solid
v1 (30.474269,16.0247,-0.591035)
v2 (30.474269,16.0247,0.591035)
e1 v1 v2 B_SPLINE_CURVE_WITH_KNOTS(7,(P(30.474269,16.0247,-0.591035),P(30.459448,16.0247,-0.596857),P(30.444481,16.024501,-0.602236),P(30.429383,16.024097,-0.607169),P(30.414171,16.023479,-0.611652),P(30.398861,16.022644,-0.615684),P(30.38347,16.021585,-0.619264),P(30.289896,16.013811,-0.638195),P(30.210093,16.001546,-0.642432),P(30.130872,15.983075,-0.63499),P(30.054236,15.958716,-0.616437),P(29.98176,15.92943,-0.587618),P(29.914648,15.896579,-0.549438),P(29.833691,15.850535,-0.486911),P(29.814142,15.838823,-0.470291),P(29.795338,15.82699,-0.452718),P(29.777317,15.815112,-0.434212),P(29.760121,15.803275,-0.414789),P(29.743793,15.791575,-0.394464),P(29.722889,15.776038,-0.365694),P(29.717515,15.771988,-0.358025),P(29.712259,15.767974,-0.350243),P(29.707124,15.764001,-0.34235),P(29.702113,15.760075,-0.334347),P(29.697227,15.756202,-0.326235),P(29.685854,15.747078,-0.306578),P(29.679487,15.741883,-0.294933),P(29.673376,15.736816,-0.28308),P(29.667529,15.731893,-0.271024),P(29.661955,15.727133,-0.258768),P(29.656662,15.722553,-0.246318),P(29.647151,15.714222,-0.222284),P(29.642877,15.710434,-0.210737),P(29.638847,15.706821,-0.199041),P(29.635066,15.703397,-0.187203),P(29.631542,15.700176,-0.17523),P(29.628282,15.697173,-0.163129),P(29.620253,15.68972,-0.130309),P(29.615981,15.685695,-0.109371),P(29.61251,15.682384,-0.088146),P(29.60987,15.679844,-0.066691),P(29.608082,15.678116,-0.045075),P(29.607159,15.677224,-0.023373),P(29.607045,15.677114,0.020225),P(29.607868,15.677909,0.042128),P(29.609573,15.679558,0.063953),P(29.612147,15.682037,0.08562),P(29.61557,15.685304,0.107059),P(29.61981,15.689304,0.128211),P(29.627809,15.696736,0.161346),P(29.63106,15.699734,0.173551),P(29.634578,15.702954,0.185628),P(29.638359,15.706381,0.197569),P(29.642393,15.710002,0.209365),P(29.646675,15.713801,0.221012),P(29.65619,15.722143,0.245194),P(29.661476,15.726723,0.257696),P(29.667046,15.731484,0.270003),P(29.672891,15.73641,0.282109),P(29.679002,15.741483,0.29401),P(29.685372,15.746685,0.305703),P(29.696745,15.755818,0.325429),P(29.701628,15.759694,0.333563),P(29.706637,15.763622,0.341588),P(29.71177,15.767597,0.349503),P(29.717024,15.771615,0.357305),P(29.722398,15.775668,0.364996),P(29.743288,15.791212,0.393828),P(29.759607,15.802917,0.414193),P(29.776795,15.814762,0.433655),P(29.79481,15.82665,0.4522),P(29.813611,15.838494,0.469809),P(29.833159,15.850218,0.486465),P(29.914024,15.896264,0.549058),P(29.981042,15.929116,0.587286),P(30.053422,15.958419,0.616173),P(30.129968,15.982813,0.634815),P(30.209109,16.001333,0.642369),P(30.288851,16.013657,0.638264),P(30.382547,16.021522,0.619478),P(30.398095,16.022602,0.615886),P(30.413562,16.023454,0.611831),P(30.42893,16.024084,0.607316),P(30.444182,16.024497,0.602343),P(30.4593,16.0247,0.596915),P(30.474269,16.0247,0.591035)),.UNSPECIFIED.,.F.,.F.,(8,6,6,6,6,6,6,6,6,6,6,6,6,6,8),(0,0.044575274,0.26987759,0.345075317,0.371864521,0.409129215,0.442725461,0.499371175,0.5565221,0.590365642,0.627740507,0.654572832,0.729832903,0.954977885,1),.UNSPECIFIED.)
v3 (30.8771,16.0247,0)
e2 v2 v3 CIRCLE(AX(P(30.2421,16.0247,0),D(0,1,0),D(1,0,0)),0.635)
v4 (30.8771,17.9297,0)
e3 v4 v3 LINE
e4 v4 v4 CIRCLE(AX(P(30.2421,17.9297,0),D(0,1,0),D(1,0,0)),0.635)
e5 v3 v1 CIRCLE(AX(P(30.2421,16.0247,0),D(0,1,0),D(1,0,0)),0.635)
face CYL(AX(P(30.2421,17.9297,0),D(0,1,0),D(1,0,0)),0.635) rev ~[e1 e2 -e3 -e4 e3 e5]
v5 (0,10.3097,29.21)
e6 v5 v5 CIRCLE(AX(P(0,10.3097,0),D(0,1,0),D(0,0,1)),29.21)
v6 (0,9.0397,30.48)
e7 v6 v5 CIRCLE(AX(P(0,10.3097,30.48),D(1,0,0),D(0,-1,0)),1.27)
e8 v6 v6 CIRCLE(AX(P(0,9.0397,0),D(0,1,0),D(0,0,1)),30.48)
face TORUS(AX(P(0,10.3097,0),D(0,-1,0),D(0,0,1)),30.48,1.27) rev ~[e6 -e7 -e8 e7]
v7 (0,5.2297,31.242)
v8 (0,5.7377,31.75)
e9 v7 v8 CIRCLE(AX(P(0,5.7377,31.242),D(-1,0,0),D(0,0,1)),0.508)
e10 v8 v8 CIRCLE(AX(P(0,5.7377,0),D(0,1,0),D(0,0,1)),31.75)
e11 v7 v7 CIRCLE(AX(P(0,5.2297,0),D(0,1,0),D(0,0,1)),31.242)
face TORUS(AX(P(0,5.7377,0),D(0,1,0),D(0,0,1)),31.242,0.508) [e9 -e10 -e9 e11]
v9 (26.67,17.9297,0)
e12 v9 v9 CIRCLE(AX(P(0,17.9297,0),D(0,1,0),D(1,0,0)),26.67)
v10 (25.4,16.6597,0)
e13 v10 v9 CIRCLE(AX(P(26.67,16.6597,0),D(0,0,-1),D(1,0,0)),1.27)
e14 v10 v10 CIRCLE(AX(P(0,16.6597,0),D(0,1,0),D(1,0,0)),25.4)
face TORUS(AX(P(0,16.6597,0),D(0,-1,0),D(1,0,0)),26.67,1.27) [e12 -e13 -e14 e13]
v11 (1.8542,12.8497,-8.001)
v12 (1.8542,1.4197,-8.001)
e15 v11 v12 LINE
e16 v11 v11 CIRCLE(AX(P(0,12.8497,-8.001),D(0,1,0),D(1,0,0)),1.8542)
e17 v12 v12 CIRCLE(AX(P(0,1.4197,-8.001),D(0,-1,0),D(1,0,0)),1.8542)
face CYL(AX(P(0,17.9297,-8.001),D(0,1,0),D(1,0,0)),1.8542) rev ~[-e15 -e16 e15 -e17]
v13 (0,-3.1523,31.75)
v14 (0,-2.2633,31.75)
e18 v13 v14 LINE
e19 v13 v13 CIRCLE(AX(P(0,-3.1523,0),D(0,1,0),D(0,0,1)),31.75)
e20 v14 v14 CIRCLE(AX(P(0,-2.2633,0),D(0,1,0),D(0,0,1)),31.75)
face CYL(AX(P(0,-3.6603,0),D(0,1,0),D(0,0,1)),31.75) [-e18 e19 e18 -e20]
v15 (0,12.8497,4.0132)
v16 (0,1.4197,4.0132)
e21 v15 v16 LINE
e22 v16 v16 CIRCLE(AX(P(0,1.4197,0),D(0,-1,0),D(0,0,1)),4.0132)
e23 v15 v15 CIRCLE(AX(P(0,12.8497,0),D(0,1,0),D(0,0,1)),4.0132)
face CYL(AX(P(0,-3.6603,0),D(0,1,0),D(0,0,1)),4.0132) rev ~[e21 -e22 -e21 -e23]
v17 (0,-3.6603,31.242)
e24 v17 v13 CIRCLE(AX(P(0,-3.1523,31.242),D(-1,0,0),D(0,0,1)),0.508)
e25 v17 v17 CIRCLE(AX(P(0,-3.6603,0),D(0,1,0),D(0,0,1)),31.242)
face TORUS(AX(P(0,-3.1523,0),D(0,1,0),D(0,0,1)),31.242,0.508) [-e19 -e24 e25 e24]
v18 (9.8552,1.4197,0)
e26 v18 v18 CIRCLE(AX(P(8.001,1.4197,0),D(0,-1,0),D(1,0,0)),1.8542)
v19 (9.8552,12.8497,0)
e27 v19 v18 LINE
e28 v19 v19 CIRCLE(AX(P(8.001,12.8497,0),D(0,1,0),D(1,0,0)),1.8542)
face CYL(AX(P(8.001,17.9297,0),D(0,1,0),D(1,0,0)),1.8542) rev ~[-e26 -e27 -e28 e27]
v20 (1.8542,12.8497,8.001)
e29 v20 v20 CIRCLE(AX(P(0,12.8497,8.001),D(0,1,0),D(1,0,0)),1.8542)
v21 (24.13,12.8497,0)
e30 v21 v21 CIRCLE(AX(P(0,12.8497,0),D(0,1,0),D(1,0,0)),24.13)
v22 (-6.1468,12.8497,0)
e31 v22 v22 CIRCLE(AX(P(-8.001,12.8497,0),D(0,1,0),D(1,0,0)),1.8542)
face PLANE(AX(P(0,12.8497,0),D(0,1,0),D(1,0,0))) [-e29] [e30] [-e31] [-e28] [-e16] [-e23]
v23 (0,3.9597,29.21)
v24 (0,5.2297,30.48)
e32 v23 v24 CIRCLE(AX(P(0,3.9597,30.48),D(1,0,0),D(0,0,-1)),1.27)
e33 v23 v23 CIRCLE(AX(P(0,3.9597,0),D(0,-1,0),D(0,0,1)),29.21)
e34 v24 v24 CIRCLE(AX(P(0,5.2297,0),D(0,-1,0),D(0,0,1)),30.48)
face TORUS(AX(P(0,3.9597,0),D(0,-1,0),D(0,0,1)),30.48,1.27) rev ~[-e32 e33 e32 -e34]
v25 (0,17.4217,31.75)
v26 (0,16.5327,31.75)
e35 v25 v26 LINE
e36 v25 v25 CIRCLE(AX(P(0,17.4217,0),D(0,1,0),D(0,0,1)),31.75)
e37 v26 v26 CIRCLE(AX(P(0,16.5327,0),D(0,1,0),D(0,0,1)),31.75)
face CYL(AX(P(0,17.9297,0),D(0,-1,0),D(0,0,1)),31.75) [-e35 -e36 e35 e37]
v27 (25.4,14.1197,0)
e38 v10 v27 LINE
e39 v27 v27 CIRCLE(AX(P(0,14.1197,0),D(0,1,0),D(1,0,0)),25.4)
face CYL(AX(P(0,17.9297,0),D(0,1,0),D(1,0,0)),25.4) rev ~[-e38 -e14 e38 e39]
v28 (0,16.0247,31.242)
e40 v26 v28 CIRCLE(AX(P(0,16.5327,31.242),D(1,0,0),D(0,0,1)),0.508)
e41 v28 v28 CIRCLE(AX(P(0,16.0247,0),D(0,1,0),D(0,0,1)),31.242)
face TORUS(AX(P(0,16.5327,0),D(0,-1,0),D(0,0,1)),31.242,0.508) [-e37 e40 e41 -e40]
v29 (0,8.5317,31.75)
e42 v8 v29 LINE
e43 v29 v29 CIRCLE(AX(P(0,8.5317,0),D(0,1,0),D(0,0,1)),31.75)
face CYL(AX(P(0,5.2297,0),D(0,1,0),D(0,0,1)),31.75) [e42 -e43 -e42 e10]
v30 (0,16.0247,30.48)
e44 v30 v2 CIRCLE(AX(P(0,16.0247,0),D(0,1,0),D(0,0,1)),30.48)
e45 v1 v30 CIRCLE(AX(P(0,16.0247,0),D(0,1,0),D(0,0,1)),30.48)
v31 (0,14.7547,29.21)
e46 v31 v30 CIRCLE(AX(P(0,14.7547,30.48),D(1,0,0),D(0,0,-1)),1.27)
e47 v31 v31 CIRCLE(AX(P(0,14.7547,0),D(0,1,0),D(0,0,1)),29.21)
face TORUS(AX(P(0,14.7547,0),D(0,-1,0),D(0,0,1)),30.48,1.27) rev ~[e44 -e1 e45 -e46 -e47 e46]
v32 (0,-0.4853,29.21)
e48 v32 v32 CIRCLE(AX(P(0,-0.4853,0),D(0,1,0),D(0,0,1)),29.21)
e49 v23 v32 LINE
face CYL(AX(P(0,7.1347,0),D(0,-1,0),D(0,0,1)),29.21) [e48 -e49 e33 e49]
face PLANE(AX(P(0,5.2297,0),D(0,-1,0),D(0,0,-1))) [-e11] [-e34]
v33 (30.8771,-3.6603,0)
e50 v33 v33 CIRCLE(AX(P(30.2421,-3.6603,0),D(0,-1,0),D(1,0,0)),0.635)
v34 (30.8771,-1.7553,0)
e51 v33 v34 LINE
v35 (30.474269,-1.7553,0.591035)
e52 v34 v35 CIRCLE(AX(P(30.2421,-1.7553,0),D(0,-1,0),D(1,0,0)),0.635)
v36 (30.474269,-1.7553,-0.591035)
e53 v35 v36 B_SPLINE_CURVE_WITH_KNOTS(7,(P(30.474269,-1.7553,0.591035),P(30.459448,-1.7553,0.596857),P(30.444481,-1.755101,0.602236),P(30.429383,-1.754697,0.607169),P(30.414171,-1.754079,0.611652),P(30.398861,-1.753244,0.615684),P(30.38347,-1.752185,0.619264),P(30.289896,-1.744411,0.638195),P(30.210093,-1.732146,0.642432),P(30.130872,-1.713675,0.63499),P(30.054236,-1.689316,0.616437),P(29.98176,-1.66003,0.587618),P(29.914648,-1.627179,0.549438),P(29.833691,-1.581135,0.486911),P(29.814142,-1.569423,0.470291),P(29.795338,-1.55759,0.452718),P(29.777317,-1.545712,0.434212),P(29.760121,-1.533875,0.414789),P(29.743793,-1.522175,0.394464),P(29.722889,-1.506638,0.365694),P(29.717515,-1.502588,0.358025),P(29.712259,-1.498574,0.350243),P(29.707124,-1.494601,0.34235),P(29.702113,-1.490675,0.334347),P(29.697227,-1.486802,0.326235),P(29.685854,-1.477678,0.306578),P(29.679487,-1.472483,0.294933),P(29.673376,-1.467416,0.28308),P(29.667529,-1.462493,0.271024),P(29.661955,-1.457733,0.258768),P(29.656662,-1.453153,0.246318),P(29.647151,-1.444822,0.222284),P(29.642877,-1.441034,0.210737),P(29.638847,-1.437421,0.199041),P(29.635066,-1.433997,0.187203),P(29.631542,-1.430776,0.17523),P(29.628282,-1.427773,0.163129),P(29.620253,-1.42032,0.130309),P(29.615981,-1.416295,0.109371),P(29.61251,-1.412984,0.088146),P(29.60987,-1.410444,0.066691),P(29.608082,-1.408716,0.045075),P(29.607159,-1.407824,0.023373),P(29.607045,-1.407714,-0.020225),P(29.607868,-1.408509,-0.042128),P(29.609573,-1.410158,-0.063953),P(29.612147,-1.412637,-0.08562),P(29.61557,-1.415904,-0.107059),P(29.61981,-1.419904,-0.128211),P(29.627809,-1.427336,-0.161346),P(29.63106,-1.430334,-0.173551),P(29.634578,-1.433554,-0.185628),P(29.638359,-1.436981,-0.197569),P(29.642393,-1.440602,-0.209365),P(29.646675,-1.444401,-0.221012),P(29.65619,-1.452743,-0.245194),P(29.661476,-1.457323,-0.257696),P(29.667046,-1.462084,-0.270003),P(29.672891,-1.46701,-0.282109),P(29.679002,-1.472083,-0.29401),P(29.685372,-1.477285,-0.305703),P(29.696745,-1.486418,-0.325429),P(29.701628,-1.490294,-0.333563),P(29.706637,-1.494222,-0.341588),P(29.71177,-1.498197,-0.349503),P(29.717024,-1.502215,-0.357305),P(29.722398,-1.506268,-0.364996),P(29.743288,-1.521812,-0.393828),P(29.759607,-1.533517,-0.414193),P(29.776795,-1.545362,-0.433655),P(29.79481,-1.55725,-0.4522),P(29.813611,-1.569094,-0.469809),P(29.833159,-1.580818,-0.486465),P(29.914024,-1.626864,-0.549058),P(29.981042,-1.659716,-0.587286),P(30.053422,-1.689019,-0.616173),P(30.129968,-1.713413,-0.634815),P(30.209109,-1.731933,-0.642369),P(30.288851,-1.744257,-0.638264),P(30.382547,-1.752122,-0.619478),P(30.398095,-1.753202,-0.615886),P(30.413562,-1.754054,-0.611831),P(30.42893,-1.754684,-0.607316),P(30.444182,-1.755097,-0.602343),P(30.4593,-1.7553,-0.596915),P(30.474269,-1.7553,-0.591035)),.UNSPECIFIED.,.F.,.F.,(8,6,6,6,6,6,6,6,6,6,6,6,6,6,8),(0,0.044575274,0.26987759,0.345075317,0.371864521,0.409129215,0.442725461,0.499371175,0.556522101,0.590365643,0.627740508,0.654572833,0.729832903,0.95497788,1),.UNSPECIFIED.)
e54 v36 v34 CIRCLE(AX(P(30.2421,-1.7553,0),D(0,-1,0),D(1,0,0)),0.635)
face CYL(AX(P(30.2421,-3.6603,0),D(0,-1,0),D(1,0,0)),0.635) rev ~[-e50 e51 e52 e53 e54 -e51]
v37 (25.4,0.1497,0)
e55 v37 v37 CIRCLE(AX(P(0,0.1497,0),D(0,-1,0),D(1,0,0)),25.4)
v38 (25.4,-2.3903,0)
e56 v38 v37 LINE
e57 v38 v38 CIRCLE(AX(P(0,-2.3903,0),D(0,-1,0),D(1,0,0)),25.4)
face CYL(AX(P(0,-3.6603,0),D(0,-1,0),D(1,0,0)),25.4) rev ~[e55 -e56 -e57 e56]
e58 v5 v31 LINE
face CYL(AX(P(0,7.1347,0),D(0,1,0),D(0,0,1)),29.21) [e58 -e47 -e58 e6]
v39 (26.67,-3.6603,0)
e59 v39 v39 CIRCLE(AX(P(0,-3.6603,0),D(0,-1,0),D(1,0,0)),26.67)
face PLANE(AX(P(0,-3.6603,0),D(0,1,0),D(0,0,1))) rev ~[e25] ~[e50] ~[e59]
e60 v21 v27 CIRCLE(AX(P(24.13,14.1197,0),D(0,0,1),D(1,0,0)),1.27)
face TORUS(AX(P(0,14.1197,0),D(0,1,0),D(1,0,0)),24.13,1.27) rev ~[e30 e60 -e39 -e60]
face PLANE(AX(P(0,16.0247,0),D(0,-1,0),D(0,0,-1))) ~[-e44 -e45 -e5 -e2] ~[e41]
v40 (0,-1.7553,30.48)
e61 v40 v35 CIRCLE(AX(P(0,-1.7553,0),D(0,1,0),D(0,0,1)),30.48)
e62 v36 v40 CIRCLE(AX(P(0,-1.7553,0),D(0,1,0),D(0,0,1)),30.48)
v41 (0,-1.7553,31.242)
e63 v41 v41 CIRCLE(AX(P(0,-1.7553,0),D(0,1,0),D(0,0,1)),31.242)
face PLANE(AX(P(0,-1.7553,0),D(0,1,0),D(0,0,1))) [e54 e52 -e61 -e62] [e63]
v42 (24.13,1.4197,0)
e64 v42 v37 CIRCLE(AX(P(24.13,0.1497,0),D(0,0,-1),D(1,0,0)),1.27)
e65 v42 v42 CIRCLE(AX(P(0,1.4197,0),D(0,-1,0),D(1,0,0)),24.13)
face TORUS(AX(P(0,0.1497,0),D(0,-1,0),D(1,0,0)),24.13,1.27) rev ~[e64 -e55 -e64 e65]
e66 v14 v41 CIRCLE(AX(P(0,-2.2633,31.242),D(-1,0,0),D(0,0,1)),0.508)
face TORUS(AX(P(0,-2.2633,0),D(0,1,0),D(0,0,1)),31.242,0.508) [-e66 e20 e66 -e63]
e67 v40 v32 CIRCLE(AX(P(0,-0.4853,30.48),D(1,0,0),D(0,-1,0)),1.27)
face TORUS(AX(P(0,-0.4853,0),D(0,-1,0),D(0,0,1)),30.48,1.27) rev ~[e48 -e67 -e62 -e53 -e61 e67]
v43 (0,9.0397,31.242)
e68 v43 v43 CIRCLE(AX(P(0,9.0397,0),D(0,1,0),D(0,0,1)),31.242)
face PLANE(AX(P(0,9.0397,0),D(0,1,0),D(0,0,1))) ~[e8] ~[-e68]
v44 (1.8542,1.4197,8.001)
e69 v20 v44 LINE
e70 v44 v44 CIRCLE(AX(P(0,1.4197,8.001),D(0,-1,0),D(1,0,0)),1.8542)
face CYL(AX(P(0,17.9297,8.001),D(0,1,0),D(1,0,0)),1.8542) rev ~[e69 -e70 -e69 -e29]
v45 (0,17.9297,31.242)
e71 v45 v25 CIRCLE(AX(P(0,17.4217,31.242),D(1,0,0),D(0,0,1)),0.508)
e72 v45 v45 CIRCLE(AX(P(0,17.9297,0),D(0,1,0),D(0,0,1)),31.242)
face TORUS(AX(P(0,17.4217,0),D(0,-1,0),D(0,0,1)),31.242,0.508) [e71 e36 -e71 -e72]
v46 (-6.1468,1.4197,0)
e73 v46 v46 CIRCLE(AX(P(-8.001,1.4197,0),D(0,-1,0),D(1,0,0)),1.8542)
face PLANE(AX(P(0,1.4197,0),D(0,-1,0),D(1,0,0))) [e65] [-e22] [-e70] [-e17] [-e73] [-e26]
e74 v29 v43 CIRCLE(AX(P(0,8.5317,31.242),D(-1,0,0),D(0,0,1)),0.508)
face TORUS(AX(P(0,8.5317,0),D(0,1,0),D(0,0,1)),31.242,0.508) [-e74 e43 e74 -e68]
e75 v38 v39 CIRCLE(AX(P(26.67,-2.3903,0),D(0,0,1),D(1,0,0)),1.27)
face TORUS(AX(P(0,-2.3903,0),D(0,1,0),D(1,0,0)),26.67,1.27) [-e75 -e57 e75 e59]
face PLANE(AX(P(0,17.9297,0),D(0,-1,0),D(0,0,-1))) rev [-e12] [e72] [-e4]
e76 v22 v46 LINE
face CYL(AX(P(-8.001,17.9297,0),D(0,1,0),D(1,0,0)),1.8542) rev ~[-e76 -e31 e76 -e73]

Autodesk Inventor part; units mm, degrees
ref_plane "YZ Plane" through (0, 0, 0) normal (1, 0, 0) x (0, 1, 0)
ref_plane "XZ Plane" through (0, 0, 0) normal (0, 1, 0) x (-1, 0, 0)
ref_plane "XY Plane" through (0, 0, 0) normal (0, 0, 1) x (1, 0, 0)
sketch "Sketch1" plane through (0, 0, 0) normal (0, 1, 0) x (-1, 0, 0)
  circle A0 centre (0, 0) radius 31.75
  dimension "d0" = 63.5
sketch "Sketch2" plane through (0, 0, 0) normal (1, 0, 0) x (0, 1, 0)
  line L0 (0, -31.75) -> (0, 31.75) projected
  line L1 (-3.6603, 0) -> (9.0397, 0)
  line L2 (9.0397, 0) -> (9.0397, 31.75)
  line L3 (-3.6603, 31.75) -> (-3.6603, 0)
  line L4 (-3.6603, 31.75) -> (-1.7553, 31.75)
  line L5 (-1.7553, 31.75) -> (-1.7553, 29.21)
  line L6 (9.0397, 31.75) -> (7.1347, 31.75)
  line L7 (7.1347, 31.75) -> (7.1347, 29.21)
  line L8 (7.1347, 29.21) -> (-1.7553, 29.21)
  line L9 (-3.6603, 0) -> (-3.6603, 4.0132)
  line L10 (-3.6603, 4.0132) -> (9.0397, 4.0132)
  line L11 (9.0397, 4.0132) -> (9.0397, 0)
  line L12 (9.0397, 0) -> (-3.6603, 0)
  line L13 (-3.6603, 0) -> (-3.6603, 4.0132)
  point P0 (0, 0)
  dimension "d1" = 12.7
  dimension "d2" = 1.905
  dimension "d5" = 1.905
  dimension "d6" = 31.75
  dimension "d7" = 4.0132
revolve "Revolution1" add sketch "Sketch2" angle 360 about axis through (0, -3.6603, 0) along (0, 1, 0) contours L10 L3 L4 L5 L8 L0 | L0 L8 L7 L6 L2 L10
sketch "Sketch3" plane through (0, -3.6603, 0) normal (0, -1, 0) x (1, 0, 0)
  circle A0 centre (0, 0) radius 4.0132 projected
  circle A1 centre (0, 0) radius 31.75 projected
  line L0 (0, 0) -> (0, 8.001)
  circle A2 centre (0, 8.001) radius 1.8542
  circle A3 centre (-8.001, 0) radius 1.8542
  circle A4 centre (0, -8.001) radius 1.8542
  circle A5 centre (8.001, 0) radius 1.8542
  dimension "d10" = 8.001
  dimension "d11" = 3.7084
  dimension "d14" = 360
extrude "Extrusion1" cut sketch "Sketch3" against normal blind 25.4 contours A2 | A3 | A4 | A5
mirror "Mirror1" about plane through (0, 7.1347, 31.75) normal (0, -1, 0)
sketch "Sketch4" plane through (0, 17.9297, 0) normal (0, 1, 0) x (1, 0, 0)
  circle A0 centre (0, 8.001) radius 1.8542 projected
  circle A1 centre (0, -8.001) radius 1.8542 projected
  circle A2 centre (-8.001, 0) radius 1.8542 projected
  circle A3 centre (8.001, 0) radius 1.8542 projected
  circle A4 centre (0, 0) radius 4.0132 projected
  circle A5 centre (0, 0) radius 31.75 projected
  circle A6 centre (0, 0) radius 25.4
  dimension "d18" = 50.8
extrude "Extrusion2" cut sketch "Sketch4" against normal blind 5.08 contours A6
fillet "Fillet2" radius 1.27 2 edges at (-25.4, 17.9297, 0) (-25.4, 12.8497, 0)
sketch "Sketch5" plane through (0, -3.6603, 0) normal (0, -1, 0) x (1, 0, 0)
  circle A0 centre (0, -8.001) radius 1.8542 projected
  circle A1 centre (0, 8.001) radius 1.8542 projected
  circle A2 centre (-8.001, 0) radius 1.8542 projected
  circle A3 centre (8.001, 0) radius 1.8542 projected
  circle A4 centre (0, 0) radius 4.0132 projected
  circle A5 centre (0, 0) radius 24.13 projected
  circle A6 centre (0, 0) radius 25.4
  dimension "d22" = 48.26
  dimension "d23" = 50.8
extrude "Extrusion3" cut sketch "Sketch5" against normal blind 5.08 contours A5 | A6
fillet "Fillet3" radius 1.27 2 edges at (-25.4, -3.6603, 0) (-25.4, 1.4197, 0)
fillet "Fillet4" radius 0.508 6 edges at (0, -3.6603, -31.75) (0, -1.7553, -31.75) (0, 5.2297, -31.75) (0, 9.0397, -31.75) (0, 16.0247, -31.75) (0, 17.9297, -31.75)
sketch "Sketch6" plane through (0, -3.6603, 0) normal (0, -1, 0) x (1, 0, 0)
  circle A0 centre (0, 0) radius 29.21 projected
  circle A1 centre (30.2421, 0) radius 0.635
  dimension "d28" = 1.27
extrude "Extrusion4" cut sketch "Sketch6" against normal blind 7.62 contours A1
sketch "Sketch7" plane through (0, 17.9297, 0) normal (0, 1, 0) x (1, 0, 0)
  circle A0 centre (30.2421, 0) radius 0.635 projected
extrude "Extrusion5" cut sketch "Sketch7" against normal blind 7.62
fillet "Fillet5" radius 1.27 4 edges at (0, 16.0247, -29.21) (0, 9.0397, -29.21) (0, 5.2297, -29.21) (0, -1.7553, -29.21)
properties part number "Spool"
